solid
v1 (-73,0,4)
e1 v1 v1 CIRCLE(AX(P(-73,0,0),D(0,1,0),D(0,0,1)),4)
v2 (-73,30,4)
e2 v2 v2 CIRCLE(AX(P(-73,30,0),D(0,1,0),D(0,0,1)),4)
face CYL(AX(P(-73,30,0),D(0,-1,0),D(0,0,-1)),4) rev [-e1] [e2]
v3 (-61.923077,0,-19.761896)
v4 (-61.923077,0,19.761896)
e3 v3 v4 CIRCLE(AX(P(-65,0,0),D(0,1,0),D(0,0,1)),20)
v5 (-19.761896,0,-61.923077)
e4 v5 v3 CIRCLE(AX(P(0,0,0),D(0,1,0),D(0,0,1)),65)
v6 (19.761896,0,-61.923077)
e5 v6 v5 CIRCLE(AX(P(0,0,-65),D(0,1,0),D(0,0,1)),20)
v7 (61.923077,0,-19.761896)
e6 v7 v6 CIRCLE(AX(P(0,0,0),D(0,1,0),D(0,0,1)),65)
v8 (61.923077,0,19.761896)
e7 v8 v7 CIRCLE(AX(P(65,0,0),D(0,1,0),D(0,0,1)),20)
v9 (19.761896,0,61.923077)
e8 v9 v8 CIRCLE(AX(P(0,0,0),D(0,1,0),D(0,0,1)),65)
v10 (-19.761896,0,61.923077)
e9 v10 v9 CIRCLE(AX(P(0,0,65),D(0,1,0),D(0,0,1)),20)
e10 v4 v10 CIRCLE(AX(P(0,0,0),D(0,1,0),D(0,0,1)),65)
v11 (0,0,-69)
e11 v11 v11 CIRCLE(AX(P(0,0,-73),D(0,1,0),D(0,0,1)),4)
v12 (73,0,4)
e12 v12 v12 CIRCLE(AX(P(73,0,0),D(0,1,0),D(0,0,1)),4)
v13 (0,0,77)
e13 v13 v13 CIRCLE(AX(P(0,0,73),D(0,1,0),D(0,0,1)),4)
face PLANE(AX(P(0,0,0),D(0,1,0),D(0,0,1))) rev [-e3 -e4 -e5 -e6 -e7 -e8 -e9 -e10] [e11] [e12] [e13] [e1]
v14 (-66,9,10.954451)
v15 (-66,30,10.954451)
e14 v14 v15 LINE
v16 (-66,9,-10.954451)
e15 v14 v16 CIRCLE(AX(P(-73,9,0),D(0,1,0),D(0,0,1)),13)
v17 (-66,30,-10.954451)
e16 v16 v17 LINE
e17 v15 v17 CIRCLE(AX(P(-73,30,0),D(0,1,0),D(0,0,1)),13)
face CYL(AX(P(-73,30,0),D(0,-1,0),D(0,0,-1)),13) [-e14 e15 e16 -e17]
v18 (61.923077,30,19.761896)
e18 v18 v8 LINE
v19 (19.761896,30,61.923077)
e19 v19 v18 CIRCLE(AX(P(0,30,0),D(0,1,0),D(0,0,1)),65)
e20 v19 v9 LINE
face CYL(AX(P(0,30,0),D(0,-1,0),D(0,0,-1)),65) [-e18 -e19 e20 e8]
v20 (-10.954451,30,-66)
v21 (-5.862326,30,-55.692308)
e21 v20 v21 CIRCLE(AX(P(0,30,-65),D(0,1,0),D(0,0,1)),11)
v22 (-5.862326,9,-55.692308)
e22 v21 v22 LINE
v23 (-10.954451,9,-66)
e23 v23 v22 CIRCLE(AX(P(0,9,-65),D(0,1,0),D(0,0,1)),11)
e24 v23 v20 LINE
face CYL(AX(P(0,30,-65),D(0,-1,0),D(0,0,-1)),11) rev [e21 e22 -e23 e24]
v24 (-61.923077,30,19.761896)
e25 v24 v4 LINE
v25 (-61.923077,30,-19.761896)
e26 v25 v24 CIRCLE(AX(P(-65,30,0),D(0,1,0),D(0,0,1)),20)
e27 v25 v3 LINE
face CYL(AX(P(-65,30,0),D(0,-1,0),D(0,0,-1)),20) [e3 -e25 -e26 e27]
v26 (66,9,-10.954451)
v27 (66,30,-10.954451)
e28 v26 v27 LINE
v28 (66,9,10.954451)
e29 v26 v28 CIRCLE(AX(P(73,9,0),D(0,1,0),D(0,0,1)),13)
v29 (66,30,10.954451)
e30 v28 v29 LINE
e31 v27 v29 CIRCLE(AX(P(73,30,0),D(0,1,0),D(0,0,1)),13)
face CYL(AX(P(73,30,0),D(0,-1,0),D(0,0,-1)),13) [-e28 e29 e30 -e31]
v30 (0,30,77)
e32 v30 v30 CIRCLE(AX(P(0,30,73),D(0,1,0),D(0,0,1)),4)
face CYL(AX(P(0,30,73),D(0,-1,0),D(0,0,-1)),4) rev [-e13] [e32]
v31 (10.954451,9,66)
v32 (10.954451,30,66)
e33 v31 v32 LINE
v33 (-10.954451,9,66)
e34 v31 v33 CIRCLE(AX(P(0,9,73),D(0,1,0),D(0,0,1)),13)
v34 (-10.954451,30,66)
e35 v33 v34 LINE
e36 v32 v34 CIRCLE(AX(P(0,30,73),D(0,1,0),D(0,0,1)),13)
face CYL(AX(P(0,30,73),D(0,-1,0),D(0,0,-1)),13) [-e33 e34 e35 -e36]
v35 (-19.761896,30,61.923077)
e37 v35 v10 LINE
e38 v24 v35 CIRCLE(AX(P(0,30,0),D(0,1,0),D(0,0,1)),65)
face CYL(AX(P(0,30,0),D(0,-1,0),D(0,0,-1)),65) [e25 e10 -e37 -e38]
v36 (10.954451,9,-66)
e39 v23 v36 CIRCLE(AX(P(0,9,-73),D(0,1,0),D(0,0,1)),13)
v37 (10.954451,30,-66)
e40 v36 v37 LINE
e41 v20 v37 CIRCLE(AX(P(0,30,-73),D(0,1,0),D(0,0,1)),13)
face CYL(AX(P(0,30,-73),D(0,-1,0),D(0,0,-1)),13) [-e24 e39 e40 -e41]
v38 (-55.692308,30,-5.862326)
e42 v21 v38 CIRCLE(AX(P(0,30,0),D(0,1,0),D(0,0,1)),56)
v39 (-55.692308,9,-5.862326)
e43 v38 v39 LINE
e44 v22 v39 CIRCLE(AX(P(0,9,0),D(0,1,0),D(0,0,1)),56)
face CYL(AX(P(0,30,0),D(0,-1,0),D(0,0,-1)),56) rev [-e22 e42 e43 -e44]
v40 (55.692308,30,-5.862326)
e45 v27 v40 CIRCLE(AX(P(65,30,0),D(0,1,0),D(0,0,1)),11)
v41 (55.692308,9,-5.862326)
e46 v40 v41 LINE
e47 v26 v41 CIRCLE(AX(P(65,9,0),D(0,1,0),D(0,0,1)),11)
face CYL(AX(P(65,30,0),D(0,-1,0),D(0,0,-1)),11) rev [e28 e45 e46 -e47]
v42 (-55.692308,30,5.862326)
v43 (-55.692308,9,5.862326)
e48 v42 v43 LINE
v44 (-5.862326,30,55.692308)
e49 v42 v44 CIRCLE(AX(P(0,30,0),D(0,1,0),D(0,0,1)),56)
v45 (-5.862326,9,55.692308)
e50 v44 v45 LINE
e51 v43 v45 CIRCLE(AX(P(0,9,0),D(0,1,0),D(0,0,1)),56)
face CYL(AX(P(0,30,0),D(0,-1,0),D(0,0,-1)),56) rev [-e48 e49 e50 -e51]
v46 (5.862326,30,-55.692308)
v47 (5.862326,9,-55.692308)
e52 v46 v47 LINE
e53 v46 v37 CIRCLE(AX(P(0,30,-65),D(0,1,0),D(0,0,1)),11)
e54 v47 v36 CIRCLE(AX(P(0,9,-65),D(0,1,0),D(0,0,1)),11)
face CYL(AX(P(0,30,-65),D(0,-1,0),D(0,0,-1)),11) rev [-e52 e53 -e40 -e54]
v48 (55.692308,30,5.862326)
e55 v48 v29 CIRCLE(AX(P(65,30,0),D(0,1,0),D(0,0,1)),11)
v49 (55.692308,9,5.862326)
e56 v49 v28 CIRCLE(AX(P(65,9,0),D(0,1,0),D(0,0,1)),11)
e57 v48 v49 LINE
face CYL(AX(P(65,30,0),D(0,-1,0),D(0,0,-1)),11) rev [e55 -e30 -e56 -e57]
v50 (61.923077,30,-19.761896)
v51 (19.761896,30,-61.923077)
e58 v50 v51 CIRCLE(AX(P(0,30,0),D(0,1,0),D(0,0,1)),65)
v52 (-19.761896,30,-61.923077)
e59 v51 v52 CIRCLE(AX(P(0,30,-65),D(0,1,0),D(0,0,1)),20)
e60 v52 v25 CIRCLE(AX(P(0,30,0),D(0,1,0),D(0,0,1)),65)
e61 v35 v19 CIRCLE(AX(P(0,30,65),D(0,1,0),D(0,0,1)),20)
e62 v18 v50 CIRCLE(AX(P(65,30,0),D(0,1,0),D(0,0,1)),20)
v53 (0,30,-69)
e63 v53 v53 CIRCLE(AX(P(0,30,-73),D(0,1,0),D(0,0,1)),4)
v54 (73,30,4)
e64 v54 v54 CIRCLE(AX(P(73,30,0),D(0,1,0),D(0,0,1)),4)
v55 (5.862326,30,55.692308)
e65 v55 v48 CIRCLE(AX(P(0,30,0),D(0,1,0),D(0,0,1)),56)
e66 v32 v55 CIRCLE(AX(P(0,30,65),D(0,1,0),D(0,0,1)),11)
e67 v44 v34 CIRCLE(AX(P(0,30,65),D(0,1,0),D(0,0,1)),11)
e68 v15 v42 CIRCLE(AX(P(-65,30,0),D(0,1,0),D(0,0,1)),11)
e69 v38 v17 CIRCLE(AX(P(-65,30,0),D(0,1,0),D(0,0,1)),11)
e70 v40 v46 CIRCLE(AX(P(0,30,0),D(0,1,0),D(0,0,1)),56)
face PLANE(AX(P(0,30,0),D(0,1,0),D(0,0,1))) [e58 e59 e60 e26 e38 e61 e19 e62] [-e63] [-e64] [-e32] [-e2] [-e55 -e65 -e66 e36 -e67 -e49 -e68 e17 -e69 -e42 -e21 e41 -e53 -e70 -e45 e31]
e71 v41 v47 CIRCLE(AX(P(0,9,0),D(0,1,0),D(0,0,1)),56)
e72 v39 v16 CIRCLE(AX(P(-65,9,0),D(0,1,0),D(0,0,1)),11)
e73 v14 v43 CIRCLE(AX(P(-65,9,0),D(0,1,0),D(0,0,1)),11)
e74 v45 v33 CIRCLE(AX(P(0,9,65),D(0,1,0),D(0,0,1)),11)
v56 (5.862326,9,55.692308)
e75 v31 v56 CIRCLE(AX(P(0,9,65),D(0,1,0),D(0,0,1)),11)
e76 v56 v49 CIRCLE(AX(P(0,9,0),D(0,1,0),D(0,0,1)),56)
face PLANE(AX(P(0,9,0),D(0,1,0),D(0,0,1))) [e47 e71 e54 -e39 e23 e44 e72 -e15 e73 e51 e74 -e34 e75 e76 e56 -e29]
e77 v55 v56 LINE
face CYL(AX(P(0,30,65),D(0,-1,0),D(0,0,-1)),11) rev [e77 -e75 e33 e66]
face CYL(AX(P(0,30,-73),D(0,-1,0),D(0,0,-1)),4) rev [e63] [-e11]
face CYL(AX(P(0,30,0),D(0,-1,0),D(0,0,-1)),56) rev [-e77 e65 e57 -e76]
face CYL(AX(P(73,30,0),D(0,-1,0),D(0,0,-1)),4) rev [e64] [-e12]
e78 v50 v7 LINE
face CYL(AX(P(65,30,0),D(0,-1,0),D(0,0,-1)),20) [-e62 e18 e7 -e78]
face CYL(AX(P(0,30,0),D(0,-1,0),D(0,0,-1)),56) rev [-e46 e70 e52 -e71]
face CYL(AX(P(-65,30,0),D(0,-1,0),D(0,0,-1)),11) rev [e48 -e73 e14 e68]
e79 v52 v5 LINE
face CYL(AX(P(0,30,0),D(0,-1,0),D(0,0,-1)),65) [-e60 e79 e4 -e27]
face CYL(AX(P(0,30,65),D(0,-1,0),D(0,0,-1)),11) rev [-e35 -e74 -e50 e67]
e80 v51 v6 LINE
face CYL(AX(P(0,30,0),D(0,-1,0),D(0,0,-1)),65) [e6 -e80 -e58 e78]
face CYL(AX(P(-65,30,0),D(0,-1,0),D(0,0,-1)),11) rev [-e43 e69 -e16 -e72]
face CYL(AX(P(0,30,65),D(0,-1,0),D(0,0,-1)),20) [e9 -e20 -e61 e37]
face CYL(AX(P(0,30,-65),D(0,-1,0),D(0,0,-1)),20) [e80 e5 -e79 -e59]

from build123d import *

# Parameters (mm, degrees)
SKETCH1_R           = 4
SKETCH1_R_2         = 65
BOSS_EXTRUDE1_DEPTH = 30
SHELL1_START        = 9
SHELL1_DEPTH        = 21


# Read off the part's stored shape, not the designer's step: Shell1
with BuildPart() as part:
    # Sketch1 → Boss-Extrude1 (new body)
    # profile 1 of 5: a face of its own
    with BuildSketch(Plane(origin=(0, 0, 0), x_dir=(1, 0, 0), z_dir=(0, 1, 0))):
        with BuildLine():
            ThreePointArc((-61.923076923, 19.761896275), (-85, 0), (-61.923076923, -19.761896275))
            ThreePointArc((-61.923076923, -19.761896275), (-65, 0), (-61.923076923, 19.761896275))
        make_face()
        with Locations(Location((-73, 0, 0), (0, 0, 270))):
            Circle(SKETCH1_R, mode=Mode.SUBTRACT)
    # profile 2 of 5: a face of its own
    with BuildSketch(Plane(origin=(0, 0, 0), x_dir=(1, 0, 0), z_dir=(0, 1, 0))):
        with BuildLine():
            ThreePointArc((-19.761896275, -61.923076923), (0, -85), (19.761896275, -61.923076923))
            ThreePointArc((19.761896275, -61.923076923), (0, -65), (-19.761896275, -61.923076923))
        make_face()
        with Locations(Location((0, -73, 0), (0, 0, 270))):
            Circle(SKETCH1_R, mode=Mode.SUBTRACT)
    # profile 3 of 5: a face of its own
    with BuildSketch(Plane(origin=(0, 0, 0), x_dir=(1, 0, 0), z_dir=(0, 1, 0))):
        Circle(SKETCH1_R_2)
    # profile 4 of 5: a face of its own
    with BuildSketch(Plane(origin=(0, 0, 0), x_dir=(1, 0, 0), z_dir=(0, 1, 0))):
        with BuildLine():
            ThreePointArc((65, 0), (64.226162893, -10), (61.923076923, -19.761896275))
            ThreePointArc((61.923076923, -19.761896275), (85, 0), (61.923076923, 19.761896275))
            ThreePointArc((61.923076923, 19.761896275), (64.226162893, 10), (65, 0))
        make_face()
        with Locations(Location((73, 0, 0), (0, 0, 270))):
            Circle(SKETCH1_R, mode=Mode.SUBTRACT)
    # profile 5 of 5: a face of its own
    with BuildSketch(Plane(origin=(0, 0, 0), x_dir=(1, 0, 0), z_dir=(0, 1, 0))):
        with BuildLine():
            ThreePointArc((-19.761896275, 61.923076923), (0, 65), (19.761896275, 61.923076923))
            ThreePointArc((19.761896275, 61.923076923), (0, 85), (-19.761896275, 61.923076923))
        make_face()
        with Locations(Location((0, 73, 0), (0, 0, 270))):
            Circle(SKETCH1_R, mode=Mode.SUBTRACT)
    extrude(amount=BOSS_EXTRUDE1_DEPTH)

    # Shell1 outline → Shell1 (cut)
    with BuildSketch(Plane(origin=(0, 0, 0), x_dir=(1, 0, 0), z_dir=(0, 1, 0)).offset(SHELL1_START)):
        with BuildLine():
            ThreePointArc((-66, -10.95445115), (-60.127949817, -9.862207005), (-55.692307692, -5.86232581))
            ThreePointArc((-55.692307692, -5.86232581), (-39.597979746, -39.597979746), (-5.86232581, -55.692307692))
            ThreePointArc((-5.86232581, -55.692307692), (-9.862207005, -60.127949817), (-10.95445115, -66))
            ThreePointArc((-10.95445115, -66), (0, -60), (10.95445115, -66))
            ThreePointArc((10.95445115, -66), (9.862207005, -60.127949817), (5.86232581, -55.692307692))
            ThreePointArc((5.86232581, -55.692307692), (39.597979746, -39.597979746), (55.692307692, -5.86232581))
            ThreePointArc((55.692307692, -5.86232581), (60.127949817, -9.862207005), (66, -10.95445115))
            ThreePointArc((66, -10.95445115), (60, 0), (66, 10.95445115))
            ThreePointArc((66, 10.95445115), (60.127949817, 9.862207005), (55.692307692, 5.86232581))
            ThreePointArc((55.692307692, 5.86232581), (39.597979746, 39.597979746), (5.86232581, 55.692307692))
            ThreePointArc((5.86232581, 55.692307692), (9.862207005, 60.127949817), (10.95445115, 66))
            ThreePointArc((10.95445115, 66), (0, 60), (-10.95445115, 66))
            ThreePointArc((-10.95445115, 66), (-9.862207005, 60.127949817), (-5.86232581, 55.692307692))
            ThreePointArc((-5.86232581, 55.692307692), (-39.597979746, 39.597979746), (-55.692307692, 5.86232581))
            ThreePointArc((-55.692307692, 5.86232581), (-60.127949817, 9.862207005), (-66, 10.95445115))
            ThreePointArc((-66, 10.95445115), (-60, 0), (-66, -10.95445115))
        make_face()
    extrude(amount=SHELL1_DEPTH, mode=Mode.SUBTRACT)


solid = part.part
